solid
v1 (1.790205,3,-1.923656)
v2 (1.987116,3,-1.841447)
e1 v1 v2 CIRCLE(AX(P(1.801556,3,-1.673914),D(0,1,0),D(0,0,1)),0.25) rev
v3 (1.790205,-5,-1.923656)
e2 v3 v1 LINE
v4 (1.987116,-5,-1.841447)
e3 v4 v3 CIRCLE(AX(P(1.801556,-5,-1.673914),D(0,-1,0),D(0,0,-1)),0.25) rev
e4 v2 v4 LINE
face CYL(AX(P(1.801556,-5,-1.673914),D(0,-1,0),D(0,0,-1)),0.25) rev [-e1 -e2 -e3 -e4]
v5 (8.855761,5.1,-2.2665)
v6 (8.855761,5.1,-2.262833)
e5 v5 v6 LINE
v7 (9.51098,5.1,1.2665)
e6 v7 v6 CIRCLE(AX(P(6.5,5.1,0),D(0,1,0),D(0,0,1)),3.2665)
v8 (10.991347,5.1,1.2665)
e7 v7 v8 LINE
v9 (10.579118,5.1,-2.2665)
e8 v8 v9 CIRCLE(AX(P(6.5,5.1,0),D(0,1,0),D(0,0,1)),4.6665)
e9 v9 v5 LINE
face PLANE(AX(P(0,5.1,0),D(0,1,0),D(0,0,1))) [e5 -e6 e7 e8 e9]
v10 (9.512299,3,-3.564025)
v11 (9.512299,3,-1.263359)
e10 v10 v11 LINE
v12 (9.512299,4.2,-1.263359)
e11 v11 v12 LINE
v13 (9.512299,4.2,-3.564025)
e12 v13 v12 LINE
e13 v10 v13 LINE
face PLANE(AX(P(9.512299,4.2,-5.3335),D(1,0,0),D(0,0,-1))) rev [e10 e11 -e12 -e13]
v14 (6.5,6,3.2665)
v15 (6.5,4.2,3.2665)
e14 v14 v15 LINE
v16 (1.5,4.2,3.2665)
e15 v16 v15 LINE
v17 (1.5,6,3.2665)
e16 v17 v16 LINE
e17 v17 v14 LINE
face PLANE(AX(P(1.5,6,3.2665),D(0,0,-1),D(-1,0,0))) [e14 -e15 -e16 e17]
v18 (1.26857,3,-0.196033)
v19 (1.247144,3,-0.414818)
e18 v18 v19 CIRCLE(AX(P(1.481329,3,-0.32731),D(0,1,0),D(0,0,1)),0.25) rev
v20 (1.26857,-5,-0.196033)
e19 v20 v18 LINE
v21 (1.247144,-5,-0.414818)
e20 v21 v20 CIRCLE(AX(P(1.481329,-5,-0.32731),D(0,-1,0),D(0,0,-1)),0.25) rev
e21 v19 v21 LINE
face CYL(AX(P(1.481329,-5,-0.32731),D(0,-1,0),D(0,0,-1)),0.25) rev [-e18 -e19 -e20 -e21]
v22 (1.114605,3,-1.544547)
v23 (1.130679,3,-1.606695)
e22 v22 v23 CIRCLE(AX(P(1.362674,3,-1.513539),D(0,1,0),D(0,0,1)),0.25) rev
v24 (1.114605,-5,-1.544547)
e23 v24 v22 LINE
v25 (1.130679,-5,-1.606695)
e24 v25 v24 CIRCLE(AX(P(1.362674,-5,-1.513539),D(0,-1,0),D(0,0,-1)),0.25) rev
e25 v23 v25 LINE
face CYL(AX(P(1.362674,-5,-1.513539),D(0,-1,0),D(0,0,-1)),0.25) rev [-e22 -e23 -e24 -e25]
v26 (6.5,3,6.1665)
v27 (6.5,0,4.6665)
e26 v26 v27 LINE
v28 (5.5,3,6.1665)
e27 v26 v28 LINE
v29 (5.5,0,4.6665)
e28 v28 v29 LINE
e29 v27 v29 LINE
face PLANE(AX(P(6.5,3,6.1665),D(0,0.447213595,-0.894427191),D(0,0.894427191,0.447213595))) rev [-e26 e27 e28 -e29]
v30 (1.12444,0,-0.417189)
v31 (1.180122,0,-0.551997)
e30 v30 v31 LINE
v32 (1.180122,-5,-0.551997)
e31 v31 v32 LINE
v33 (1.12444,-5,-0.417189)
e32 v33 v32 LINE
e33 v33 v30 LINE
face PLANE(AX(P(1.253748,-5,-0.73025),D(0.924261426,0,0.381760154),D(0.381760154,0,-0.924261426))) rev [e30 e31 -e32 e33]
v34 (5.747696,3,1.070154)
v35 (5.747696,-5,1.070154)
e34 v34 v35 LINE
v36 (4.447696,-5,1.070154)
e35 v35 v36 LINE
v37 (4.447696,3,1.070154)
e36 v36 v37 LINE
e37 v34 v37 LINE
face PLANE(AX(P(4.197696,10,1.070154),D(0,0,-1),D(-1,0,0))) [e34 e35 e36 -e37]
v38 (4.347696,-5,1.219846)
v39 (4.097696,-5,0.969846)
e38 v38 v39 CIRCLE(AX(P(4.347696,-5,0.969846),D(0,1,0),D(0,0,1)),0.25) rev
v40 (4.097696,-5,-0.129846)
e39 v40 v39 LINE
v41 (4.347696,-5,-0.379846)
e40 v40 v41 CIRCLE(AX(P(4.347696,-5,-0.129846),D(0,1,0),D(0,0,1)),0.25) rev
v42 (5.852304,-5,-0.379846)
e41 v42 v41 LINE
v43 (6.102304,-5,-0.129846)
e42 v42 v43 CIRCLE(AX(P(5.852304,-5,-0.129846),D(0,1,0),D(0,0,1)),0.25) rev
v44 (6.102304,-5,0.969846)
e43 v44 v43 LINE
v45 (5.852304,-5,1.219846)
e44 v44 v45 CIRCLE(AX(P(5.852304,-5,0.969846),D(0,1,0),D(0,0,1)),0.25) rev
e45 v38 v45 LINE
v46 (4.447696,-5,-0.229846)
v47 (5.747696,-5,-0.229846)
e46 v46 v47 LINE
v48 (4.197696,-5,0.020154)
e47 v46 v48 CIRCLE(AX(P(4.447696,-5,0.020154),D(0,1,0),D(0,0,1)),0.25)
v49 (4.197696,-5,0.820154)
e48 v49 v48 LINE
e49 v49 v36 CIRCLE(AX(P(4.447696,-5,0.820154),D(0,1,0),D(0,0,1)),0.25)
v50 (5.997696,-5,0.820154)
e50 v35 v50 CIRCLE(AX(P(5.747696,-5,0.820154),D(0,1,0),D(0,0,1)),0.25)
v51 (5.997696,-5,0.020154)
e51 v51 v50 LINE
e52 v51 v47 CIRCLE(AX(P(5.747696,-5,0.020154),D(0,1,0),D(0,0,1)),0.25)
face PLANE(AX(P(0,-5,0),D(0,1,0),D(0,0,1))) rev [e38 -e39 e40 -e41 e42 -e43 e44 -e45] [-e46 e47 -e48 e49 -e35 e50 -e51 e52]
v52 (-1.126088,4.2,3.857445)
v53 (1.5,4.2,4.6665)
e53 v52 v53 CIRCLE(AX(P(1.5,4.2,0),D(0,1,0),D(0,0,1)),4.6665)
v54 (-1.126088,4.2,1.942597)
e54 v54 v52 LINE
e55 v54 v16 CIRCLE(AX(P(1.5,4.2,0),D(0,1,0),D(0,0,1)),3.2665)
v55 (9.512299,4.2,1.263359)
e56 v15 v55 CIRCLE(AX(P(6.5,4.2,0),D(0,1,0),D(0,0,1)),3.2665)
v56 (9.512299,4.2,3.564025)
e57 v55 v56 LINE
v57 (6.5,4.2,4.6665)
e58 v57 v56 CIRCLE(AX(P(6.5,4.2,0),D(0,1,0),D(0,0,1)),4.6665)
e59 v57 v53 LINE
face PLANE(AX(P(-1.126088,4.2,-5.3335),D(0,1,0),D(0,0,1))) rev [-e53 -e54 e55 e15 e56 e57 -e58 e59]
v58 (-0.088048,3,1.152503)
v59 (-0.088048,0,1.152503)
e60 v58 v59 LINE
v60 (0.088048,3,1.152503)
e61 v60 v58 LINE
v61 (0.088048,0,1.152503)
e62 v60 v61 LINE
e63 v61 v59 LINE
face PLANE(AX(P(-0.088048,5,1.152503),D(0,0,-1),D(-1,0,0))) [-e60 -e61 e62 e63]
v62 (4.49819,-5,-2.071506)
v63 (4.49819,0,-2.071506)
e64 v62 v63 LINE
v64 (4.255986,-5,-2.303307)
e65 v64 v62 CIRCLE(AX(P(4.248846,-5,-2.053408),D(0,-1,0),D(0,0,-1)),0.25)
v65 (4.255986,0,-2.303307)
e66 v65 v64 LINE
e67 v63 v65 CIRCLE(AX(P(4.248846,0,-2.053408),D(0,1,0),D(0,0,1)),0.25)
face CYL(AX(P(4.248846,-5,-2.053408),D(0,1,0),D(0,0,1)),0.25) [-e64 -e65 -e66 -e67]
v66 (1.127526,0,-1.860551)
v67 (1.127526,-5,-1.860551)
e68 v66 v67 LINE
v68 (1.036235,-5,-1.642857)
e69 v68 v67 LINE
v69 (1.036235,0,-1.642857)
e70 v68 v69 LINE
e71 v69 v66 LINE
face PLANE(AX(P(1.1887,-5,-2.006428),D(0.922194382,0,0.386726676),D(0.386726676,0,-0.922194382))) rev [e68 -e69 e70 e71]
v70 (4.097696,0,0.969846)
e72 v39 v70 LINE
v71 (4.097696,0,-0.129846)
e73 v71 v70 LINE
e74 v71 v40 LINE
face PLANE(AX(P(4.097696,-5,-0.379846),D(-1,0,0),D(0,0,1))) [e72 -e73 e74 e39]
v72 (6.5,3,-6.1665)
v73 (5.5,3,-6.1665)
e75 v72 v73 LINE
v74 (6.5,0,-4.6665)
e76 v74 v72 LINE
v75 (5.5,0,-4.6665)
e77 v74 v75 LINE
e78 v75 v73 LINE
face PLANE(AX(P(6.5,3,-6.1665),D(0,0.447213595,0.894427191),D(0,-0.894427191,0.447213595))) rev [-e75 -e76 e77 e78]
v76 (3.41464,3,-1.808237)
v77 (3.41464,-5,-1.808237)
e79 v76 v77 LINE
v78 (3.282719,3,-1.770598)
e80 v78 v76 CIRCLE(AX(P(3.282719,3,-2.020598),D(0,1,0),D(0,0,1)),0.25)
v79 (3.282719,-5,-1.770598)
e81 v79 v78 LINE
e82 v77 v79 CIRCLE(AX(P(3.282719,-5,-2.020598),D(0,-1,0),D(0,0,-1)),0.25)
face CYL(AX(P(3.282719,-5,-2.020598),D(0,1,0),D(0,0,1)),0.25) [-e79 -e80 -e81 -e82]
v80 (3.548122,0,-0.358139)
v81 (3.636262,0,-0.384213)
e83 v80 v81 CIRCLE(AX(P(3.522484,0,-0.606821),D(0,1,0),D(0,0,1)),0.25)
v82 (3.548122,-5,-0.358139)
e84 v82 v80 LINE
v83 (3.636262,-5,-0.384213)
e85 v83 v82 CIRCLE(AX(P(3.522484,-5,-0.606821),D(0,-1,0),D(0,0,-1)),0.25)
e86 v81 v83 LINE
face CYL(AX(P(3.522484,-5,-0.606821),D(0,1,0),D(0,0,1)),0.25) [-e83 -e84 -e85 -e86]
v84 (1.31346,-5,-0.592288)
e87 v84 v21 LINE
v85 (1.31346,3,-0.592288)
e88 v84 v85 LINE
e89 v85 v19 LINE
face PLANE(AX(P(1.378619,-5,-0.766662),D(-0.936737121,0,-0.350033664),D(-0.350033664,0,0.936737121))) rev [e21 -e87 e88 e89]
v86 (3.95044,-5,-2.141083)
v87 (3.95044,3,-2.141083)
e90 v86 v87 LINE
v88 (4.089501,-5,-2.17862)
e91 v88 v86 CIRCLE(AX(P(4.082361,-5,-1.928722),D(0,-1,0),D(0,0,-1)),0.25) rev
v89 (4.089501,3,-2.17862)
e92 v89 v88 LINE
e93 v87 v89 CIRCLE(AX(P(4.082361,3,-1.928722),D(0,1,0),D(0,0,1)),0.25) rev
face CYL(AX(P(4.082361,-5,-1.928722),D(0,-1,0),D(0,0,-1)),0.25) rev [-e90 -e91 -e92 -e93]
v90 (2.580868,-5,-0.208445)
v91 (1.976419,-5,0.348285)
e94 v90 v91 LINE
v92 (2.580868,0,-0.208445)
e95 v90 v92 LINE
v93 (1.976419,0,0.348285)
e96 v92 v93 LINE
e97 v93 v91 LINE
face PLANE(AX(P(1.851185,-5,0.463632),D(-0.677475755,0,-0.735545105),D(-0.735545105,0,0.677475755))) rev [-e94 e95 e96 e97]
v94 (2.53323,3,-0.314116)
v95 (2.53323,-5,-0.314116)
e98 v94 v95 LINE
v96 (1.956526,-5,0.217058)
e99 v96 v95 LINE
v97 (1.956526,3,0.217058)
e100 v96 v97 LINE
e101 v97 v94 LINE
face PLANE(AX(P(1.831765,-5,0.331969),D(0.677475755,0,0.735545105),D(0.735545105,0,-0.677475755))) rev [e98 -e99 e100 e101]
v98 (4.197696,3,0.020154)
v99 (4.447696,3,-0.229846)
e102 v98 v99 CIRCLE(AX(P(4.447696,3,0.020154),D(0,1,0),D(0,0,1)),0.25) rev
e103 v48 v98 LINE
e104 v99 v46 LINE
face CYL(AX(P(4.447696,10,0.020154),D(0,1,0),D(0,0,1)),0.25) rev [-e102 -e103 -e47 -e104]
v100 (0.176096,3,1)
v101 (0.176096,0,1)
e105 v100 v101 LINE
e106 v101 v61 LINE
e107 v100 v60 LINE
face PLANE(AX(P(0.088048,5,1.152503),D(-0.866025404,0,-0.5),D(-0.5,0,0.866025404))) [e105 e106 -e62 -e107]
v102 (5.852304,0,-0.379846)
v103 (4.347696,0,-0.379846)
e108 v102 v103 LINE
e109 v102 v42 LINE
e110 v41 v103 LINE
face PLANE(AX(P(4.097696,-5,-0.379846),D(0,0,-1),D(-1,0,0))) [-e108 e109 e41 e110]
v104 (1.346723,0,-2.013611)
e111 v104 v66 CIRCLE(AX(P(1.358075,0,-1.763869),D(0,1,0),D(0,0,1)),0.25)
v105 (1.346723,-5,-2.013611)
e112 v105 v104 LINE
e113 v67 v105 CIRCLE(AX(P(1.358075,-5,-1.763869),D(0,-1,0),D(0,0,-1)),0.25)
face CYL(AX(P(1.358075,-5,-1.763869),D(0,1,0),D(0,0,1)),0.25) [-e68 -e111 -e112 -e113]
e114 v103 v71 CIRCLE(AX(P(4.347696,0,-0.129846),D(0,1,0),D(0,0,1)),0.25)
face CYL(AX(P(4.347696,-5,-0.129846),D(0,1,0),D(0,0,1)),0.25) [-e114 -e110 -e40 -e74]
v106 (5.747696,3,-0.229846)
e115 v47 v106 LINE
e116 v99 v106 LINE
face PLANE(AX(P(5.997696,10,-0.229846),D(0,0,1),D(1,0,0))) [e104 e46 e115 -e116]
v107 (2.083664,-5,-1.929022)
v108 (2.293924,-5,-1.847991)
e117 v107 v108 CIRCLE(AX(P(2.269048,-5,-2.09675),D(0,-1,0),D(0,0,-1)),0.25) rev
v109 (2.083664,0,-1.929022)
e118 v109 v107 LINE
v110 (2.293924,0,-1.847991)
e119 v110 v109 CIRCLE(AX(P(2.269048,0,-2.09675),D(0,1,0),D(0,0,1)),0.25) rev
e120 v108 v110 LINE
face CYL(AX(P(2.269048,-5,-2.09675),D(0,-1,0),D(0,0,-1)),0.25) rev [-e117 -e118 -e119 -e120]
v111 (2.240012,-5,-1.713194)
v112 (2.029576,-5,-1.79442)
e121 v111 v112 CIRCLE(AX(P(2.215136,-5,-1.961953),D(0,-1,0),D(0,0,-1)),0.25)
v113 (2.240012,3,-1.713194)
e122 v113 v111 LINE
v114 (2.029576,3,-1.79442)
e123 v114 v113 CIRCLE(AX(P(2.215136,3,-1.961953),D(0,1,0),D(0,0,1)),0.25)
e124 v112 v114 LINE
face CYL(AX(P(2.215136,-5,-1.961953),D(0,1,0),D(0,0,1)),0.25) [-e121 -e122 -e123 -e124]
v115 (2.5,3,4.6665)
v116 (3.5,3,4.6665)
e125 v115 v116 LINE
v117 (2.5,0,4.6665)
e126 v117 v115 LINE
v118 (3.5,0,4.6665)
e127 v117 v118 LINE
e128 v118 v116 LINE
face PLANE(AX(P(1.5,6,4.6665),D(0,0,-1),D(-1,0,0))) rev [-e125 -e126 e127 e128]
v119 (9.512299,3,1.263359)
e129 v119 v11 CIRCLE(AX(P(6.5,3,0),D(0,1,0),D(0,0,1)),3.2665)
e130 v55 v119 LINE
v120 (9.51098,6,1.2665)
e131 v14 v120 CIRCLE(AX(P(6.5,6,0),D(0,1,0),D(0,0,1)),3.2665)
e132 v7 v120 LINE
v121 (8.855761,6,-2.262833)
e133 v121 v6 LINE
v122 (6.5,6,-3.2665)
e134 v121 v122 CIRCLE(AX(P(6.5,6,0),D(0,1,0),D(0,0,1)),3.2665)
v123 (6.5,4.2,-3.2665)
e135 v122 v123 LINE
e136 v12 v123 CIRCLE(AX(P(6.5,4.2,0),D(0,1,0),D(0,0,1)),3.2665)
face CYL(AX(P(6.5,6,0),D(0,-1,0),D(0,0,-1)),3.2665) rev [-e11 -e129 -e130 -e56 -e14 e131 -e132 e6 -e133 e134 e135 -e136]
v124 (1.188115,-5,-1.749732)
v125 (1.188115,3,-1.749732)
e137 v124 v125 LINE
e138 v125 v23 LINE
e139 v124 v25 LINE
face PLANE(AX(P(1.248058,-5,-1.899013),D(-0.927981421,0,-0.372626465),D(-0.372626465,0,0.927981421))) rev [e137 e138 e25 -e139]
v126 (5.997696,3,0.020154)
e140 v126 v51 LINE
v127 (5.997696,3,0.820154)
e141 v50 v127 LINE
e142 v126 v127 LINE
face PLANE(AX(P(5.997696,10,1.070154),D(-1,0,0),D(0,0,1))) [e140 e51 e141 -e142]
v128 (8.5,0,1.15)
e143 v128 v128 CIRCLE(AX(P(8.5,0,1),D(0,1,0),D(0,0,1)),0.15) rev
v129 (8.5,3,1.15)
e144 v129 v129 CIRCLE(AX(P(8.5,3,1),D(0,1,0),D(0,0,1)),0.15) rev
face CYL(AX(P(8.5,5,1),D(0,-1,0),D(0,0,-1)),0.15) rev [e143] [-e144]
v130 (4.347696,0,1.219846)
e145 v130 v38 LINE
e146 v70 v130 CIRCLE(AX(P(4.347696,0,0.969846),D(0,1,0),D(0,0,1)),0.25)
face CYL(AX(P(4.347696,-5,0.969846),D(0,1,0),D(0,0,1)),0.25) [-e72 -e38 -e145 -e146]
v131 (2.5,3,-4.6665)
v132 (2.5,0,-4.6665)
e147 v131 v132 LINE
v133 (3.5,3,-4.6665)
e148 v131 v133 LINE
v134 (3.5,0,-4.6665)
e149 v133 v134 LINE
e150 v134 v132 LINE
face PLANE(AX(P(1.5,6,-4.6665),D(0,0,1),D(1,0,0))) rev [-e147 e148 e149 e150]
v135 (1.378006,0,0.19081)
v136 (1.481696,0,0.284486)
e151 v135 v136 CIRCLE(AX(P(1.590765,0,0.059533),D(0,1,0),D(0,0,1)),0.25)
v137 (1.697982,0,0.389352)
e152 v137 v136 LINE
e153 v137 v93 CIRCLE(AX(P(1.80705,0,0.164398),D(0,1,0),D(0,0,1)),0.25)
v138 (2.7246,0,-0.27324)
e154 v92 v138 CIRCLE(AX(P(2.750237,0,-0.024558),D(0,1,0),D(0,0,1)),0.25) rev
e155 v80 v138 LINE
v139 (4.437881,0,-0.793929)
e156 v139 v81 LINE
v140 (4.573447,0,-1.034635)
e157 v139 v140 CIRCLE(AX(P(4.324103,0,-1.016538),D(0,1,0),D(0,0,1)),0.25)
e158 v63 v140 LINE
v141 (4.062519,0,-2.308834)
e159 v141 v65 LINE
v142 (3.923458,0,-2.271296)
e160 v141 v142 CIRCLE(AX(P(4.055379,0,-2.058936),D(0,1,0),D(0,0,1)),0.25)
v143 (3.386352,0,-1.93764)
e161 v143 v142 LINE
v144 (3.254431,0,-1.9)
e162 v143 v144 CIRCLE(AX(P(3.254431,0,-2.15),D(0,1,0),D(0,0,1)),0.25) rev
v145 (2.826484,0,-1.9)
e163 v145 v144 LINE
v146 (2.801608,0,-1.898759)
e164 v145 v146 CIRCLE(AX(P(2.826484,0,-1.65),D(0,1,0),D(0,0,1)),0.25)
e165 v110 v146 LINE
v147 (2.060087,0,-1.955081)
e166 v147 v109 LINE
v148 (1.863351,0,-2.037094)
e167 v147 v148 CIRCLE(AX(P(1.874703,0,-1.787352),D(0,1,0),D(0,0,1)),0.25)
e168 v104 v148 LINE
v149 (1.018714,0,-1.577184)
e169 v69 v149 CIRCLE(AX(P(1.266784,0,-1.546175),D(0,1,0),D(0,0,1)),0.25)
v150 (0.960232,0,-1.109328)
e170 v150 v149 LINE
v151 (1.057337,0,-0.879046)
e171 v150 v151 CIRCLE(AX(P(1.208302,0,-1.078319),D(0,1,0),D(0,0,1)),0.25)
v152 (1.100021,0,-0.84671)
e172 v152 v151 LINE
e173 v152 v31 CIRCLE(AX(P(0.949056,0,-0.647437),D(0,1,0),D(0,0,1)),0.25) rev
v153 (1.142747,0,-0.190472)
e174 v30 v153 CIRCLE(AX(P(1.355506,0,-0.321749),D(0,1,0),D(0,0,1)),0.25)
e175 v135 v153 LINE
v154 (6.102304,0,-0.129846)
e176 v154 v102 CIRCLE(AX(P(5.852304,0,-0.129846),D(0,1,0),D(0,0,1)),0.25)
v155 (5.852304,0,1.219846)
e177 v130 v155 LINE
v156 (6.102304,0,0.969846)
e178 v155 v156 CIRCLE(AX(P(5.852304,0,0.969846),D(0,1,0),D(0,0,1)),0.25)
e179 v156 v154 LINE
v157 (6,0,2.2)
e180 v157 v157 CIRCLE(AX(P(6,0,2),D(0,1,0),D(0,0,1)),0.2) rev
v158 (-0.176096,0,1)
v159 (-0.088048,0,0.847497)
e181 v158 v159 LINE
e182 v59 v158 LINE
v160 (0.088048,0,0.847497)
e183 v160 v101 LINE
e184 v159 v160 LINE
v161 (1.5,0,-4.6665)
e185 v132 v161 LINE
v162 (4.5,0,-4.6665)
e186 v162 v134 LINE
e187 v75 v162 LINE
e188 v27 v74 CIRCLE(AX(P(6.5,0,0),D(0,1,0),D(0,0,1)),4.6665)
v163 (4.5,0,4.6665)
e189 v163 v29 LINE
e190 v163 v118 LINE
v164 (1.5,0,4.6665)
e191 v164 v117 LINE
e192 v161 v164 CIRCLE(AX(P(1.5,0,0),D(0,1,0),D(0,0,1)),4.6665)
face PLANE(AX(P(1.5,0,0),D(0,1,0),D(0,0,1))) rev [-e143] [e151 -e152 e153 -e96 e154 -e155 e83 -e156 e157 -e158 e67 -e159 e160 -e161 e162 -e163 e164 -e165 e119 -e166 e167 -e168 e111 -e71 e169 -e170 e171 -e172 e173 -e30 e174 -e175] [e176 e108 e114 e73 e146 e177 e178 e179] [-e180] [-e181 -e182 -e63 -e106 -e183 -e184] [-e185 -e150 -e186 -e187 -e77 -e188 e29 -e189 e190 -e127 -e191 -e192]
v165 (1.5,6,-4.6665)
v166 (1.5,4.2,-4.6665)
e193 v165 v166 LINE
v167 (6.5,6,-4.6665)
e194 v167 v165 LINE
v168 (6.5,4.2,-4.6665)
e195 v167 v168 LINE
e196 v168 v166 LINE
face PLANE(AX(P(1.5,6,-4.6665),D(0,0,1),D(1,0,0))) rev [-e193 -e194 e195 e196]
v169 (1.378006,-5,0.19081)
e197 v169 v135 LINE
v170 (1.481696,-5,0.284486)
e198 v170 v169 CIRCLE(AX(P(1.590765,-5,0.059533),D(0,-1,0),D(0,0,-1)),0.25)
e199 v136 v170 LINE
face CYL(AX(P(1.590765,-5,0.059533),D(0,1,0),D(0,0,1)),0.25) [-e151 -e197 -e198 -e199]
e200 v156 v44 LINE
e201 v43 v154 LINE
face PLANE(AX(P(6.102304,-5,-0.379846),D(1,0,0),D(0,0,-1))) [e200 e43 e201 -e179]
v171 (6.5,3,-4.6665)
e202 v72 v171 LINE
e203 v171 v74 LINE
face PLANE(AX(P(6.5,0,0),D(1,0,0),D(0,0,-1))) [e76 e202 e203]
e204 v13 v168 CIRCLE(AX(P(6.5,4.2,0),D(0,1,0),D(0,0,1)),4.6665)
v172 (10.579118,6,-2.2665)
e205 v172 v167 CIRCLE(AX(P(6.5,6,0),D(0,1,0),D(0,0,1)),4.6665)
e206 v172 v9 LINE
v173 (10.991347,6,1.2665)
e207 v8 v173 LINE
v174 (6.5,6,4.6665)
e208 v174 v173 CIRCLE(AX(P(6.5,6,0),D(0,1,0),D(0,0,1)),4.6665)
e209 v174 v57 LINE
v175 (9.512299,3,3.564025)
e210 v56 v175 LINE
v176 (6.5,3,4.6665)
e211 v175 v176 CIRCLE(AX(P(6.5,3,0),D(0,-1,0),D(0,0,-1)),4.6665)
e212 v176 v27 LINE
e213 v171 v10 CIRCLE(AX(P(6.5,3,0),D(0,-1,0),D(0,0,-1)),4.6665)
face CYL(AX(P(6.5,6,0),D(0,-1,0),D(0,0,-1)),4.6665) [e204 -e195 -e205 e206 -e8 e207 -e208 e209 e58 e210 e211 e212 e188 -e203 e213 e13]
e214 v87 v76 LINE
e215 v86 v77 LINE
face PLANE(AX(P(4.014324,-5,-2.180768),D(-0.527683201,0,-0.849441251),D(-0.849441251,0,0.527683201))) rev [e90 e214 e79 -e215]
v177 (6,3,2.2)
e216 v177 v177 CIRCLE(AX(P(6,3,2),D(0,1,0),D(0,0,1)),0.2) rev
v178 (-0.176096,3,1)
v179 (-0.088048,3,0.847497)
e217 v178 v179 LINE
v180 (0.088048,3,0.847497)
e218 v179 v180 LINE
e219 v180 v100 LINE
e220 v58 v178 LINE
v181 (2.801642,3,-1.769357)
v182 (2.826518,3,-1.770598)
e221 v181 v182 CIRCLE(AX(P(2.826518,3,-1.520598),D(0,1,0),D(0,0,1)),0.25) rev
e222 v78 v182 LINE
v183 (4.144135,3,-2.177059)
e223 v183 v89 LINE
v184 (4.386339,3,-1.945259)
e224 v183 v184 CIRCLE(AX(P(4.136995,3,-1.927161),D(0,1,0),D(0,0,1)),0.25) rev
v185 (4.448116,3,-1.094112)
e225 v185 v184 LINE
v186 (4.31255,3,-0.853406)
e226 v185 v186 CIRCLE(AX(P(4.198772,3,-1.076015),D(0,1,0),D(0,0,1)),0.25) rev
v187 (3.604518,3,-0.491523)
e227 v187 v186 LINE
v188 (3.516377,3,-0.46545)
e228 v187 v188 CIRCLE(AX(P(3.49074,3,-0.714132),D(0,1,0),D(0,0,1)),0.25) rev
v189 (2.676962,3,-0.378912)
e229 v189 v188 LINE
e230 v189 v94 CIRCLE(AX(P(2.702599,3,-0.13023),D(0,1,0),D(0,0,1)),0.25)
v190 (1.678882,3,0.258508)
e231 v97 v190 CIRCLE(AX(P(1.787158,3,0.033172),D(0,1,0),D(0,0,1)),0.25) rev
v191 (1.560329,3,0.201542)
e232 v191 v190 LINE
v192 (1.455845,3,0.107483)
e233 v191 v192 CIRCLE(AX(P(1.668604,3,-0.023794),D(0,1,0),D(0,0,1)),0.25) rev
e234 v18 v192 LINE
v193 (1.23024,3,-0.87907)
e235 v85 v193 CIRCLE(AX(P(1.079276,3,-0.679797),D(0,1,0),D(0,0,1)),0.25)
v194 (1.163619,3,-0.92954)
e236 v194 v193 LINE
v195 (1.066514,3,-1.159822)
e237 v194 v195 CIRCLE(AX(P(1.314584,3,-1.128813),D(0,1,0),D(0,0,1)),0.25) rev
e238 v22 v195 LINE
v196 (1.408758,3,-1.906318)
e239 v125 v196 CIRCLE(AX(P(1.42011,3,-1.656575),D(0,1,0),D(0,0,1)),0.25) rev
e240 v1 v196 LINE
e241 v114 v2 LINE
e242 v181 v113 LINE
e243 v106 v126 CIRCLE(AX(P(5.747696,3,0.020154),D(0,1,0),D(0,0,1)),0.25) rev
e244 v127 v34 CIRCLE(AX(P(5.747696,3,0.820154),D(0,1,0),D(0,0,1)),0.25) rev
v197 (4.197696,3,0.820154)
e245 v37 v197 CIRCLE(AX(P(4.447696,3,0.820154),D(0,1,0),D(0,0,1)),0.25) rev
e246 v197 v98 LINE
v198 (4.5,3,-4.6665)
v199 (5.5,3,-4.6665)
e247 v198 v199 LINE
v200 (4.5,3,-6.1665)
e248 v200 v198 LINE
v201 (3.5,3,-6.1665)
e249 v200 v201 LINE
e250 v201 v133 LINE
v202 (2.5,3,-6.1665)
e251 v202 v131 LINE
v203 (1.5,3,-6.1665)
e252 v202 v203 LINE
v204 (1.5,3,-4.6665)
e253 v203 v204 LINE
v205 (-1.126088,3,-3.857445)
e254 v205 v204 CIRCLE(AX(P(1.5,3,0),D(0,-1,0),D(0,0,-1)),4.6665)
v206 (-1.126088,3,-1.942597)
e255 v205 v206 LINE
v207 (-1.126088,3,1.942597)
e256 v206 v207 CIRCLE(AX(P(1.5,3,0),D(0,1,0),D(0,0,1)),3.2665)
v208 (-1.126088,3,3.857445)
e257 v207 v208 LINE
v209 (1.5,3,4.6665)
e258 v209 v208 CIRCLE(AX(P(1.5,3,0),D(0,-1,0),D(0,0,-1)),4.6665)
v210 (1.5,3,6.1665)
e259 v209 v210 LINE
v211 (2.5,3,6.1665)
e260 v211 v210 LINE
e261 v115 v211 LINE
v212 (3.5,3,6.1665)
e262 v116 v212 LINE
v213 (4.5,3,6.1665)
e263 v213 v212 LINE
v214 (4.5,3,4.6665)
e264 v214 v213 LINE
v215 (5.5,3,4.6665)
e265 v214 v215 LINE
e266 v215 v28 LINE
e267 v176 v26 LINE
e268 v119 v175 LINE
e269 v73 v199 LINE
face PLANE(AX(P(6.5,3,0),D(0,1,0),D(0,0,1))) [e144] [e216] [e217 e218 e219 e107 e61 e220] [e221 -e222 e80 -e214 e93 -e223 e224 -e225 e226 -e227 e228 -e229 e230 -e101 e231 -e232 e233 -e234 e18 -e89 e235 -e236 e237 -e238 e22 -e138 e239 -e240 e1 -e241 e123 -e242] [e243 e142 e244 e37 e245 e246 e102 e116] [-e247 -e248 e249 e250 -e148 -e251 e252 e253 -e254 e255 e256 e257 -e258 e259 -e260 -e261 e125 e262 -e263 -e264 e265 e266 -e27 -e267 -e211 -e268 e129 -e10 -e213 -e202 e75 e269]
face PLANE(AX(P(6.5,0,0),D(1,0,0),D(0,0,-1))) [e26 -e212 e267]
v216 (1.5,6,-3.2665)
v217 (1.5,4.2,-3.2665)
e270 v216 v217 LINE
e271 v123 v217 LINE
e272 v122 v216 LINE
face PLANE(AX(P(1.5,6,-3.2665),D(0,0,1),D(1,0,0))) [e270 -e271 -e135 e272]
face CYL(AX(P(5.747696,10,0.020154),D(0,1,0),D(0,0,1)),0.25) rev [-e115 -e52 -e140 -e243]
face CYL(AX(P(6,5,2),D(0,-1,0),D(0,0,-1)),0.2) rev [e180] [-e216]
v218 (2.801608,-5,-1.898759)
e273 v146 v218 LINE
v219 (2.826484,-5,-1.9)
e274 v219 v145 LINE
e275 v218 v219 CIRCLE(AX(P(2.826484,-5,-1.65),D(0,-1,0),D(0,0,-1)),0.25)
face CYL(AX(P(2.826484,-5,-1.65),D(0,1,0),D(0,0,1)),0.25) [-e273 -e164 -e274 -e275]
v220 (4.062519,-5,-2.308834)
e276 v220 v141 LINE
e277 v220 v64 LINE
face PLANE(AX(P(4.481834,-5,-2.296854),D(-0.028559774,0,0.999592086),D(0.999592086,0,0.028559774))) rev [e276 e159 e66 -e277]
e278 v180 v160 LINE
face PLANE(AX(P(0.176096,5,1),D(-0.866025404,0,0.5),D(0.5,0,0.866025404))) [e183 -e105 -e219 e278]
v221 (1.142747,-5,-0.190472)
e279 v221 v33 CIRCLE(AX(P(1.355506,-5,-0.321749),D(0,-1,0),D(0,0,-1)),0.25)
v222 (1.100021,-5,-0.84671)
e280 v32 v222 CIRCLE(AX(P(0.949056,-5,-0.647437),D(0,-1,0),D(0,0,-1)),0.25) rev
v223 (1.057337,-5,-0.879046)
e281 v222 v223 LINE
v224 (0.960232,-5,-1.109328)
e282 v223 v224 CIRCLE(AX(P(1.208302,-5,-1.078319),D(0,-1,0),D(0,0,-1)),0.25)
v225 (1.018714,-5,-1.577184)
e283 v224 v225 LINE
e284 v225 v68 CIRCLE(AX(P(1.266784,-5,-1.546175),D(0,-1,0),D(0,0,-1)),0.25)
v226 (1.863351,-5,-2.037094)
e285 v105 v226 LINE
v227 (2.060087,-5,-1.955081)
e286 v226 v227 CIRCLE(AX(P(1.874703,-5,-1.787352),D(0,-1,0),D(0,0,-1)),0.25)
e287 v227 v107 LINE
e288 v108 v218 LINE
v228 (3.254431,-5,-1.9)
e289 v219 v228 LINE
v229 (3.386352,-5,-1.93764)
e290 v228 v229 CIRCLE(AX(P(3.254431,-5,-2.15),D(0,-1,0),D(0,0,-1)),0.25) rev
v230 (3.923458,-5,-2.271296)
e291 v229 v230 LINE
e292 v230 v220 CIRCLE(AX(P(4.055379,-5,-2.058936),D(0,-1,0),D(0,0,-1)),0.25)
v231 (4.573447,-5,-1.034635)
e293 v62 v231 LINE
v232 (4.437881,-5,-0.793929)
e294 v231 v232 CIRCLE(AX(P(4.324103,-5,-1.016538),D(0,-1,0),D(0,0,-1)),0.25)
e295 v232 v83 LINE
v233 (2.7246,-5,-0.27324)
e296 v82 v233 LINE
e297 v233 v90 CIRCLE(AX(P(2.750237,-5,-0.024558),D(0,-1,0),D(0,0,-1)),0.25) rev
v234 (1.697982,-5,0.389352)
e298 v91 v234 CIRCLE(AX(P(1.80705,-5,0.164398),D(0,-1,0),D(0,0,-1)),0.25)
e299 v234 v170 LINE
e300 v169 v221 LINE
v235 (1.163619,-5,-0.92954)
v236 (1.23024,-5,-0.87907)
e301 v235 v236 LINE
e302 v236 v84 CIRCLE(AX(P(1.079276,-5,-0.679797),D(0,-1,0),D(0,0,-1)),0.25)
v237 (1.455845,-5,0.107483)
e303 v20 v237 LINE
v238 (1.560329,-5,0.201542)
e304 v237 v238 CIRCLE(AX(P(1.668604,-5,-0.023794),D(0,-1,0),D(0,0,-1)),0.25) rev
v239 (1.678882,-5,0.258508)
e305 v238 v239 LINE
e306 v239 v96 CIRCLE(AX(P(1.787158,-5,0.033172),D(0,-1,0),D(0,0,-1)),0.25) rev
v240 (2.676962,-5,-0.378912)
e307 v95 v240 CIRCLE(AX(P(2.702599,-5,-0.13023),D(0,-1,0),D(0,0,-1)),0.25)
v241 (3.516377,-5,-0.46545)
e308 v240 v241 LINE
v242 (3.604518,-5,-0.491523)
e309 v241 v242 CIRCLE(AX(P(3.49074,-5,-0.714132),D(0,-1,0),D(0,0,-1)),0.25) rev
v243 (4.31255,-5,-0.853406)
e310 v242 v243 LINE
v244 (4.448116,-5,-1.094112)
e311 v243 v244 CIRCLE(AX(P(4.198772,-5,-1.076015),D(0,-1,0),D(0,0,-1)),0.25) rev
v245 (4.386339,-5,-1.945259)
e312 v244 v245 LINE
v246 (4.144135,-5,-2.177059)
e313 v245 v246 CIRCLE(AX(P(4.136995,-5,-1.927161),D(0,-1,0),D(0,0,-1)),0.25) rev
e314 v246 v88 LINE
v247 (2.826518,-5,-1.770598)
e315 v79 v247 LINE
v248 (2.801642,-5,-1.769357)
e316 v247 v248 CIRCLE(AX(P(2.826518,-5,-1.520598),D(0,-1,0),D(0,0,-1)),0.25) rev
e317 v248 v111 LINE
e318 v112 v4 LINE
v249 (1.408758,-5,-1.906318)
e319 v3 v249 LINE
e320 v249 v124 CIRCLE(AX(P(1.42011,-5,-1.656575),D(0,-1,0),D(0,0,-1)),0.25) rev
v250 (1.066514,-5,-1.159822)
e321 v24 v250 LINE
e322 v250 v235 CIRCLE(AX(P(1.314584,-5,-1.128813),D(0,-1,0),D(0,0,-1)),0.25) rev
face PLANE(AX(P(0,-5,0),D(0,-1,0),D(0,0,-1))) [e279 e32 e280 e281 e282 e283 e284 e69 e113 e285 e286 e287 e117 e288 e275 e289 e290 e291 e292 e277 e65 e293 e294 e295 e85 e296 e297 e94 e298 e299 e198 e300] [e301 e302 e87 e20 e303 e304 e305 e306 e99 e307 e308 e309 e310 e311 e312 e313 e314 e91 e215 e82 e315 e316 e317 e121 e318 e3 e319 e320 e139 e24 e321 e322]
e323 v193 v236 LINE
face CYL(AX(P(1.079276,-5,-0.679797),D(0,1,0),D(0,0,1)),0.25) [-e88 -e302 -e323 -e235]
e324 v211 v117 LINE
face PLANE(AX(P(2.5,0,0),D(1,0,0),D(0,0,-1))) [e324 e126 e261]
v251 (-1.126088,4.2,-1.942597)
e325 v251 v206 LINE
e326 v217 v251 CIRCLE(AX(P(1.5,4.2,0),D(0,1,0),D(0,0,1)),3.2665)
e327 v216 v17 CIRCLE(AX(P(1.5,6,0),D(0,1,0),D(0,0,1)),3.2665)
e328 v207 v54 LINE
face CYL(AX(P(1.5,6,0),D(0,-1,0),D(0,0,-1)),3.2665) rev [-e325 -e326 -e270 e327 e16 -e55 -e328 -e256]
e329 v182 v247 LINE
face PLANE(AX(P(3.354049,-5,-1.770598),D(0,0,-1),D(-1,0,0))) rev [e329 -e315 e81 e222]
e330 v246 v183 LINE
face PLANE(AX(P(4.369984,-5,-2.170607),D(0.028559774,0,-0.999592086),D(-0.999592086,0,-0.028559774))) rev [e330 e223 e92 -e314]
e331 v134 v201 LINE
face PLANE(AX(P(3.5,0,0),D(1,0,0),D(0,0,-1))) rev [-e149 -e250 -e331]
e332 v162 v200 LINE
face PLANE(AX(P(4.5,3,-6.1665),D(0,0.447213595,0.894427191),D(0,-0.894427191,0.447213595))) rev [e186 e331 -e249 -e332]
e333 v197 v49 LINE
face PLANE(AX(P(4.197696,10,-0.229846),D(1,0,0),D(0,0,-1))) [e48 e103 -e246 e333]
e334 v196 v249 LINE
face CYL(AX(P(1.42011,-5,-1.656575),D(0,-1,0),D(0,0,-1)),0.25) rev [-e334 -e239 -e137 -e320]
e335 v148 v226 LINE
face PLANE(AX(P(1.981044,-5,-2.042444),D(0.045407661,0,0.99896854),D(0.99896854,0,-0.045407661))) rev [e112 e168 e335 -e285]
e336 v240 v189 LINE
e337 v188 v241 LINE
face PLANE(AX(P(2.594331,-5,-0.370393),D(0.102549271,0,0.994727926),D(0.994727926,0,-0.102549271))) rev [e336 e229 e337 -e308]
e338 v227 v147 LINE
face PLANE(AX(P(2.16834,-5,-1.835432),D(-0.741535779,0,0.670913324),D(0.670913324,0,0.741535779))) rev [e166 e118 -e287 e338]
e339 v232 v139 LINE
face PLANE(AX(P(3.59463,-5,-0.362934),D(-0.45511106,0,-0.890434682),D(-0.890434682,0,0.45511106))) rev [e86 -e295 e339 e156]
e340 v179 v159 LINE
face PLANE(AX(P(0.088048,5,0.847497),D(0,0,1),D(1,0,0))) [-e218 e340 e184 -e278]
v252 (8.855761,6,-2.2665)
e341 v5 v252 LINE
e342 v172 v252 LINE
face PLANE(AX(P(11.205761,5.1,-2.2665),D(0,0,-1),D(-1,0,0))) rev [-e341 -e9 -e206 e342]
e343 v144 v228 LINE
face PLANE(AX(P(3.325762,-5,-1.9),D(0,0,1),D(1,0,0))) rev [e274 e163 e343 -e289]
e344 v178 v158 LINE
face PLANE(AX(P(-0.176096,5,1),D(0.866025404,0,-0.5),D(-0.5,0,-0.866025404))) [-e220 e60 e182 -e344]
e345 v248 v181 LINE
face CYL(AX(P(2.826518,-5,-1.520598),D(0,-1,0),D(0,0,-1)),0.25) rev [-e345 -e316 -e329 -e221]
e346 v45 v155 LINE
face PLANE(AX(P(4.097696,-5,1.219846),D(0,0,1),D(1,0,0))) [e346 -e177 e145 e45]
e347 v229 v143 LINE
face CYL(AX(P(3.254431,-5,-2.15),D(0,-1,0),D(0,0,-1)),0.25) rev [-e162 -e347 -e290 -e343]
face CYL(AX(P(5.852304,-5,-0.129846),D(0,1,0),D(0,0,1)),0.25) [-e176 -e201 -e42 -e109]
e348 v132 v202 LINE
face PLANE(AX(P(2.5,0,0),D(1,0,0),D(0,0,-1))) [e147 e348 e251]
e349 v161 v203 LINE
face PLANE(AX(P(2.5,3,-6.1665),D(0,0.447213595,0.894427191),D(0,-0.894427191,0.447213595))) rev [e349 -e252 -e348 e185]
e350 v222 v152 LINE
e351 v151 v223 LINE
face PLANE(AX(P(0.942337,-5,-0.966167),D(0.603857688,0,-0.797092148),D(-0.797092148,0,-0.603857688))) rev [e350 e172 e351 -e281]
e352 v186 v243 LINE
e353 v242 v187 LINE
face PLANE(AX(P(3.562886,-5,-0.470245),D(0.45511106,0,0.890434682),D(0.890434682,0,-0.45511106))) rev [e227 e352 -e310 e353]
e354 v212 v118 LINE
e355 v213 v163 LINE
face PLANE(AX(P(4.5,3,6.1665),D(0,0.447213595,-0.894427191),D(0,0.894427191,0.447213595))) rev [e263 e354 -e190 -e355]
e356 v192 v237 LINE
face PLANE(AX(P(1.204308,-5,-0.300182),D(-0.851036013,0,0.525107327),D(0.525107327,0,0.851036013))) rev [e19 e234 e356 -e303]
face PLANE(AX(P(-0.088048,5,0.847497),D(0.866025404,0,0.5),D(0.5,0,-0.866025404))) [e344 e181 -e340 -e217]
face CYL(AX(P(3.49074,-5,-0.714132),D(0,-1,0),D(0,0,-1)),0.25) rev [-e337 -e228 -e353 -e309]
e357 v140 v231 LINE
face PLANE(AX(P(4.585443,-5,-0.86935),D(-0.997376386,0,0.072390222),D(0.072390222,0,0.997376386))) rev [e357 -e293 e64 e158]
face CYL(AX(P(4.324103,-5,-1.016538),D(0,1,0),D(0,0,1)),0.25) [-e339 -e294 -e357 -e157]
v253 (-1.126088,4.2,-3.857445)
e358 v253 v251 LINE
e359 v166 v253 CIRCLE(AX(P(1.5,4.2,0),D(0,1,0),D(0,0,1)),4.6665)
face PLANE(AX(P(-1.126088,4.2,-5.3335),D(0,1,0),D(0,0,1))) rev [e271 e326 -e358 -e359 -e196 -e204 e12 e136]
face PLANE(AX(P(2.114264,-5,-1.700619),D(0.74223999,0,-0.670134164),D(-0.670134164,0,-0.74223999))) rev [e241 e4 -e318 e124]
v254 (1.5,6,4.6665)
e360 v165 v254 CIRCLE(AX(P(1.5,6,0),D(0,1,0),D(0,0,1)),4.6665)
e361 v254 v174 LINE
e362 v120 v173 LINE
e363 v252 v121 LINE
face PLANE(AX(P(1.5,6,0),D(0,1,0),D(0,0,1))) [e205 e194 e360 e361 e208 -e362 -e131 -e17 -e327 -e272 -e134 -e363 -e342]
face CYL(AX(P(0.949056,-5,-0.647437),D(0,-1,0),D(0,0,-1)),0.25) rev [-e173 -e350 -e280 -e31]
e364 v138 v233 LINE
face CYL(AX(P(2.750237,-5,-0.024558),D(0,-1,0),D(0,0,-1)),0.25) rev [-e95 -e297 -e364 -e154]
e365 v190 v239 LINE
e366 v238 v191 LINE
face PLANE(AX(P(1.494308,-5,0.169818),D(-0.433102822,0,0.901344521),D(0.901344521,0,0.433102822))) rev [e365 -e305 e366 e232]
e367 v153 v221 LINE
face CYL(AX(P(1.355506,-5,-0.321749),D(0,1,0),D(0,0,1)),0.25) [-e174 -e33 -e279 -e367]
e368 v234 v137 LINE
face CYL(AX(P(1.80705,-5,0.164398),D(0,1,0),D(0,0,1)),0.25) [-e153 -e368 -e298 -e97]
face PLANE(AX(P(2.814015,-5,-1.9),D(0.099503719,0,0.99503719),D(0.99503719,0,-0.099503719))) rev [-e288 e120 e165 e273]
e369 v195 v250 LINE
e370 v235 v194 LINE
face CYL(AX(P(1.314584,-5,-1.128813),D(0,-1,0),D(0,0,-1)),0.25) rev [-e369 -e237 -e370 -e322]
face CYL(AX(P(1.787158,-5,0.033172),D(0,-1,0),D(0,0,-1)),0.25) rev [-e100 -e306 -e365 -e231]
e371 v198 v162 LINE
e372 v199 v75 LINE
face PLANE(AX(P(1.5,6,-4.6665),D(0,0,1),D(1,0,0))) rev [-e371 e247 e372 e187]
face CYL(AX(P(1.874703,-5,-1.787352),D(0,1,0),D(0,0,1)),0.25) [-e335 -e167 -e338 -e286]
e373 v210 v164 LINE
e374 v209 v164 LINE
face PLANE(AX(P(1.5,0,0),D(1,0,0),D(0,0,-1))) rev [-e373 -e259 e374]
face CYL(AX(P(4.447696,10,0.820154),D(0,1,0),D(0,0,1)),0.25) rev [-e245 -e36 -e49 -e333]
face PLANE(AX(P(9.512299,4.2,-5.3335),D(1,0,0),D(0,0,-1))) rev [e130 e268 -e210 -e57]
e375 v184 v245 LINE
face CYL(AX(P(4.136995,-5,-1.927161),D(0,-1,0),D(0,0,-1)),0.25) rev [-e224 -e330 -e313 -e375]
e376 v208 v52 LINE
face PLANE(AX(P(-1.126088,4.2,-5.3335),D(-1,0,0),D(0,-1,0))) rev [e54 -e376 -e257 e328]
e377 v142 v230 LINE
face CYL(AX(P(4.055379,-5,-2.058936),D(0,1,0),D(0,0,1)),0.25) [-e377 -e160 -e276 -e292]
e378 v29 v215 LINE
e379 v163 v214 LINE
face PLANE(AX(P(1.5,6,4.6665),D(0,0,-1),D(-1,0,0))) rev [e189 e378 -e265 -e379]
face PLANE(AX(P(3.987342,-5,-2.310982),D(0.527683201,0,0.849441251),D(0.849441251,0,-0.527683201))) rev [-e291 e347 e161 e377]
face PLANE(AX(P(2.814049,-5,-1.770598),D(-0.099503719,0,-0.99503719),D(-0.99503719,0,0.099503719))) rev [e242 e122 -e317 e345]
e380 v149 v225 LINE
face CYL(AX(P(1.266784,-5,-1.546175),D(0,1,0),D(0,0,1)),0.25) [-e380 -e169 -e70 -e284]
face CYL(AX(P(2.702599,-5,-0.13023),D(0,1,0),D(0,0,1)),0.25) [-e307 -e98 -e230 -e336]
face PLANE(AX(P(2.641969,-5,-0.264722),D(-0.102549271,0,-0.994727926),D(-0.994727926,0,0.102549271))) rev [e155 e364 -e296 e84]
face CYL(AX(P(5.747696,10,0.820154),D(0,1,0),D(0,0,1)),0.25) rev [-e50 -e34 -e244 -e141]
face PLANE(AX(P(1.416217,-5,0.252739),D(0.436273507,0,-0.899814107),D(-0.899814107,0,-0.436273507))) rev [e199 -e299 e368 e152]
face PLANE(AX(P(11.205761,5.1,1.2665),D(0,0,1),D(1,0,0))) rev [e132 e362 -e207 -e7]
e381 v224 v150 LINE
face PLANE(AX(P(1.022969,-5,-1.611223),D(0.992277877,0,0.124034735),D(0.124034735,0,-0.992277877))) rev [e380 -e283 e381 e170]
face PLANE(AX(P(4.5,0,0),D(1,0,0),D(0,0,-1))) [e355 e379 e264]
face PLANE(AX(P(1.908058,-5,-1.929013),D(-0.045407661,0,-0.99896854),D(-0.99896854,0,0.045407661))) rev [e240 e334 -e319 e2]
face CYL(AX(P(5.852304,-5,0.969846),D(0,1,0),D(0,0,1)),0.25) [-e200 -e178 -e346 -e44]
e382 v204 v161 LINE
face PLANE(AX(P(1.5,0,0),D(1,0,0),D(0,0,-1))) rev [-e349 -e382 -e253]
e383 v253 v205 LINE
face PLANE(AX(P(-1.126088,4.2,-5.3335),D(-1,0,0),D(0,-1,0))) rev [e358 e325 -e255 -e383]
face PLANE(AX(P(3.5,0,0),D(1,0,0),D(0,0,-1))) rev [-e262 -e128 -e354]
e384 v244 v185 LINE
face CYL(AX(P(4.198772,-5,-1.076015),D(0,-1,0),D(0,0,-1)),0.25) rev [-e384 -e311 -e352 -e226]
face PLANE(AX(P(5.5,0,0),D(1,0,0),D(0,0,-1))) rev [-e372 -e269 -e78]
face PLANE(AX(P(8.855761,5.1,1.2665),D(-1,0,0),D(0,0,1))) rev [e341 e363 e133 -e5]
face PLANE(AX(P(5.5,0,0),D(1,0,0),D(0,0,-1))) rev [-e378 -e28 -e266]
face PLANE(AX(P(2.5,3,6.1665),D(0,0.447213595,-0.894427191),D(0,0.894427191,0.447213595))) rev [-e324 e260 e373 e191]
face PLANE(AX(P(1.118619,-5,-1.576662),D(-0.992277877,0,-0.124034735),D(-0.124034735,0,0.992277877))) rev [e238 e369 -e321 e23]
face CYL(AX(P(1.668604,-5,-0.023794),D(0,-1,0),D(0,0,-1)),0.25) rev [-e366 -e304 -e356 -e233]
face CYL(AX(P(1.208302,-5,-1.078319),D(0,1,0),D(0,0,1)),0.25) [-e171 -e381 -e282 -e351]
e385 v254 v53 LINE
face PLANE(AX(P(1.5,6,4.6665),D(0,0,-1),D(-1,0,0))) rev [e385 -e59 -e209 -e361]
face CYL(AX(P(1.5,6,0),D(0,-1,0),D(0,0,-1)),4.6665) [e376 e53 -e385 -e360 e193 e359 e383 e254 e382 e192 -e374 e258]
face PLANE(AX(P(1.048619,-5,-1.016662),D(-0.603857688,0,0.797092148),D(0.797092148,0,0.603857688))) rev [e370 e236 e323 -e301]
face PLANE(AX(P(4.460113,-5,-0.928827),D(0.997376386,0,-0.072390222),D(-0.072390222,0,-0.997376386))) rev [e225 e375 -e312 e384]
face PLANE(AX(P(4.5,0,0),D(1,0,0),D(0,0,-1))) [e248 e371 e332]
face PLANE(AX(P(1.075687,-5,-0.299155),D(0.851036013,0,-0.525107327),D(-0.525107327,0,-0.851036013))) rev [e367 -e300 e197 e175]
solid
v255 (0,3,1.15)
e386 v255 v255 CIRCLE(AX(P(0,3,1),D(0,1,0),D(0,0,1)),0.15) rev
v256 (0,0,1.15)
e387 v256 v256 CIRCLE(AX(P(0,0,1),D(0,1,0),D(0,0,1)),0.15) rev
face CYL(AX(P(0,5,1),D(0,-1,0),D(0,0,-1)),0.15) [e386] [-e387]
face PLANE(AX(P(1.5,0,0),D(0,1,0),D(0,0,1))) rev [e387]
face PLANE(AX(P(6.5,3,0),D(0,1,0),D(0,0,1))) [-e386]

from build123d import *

# Parameters (mm, degrees)
LIP_DEPTH                    = 6
BASE_DEPTH                   = 3
LAMDABREGMAGUIDES_DEPTH      = 5
LAMDABREGMAGUIDES_DEPTH_BACK = 5
SKETCH16_R                   = 0.15
SKETCH16_R_2                 = 0.2
SKETCH3_W                    = 10.638387248
SKETCH3_H                    = 1.2
CUT4ACRYLIC_DEPTH            = 10
SKETCH4_W                    = 2.35
SKETCH4_H                    = 3.533
CUTFORGROUNDPIN_DEPTH        = 0.9
BOSS_EXTRUDE6_DEPTH          = 1
CRVPATTERN1_START            = 3.5
CRVPATTERN1_DEPTH            = 1
CRVPATTERN1_START_2          = 5.5
CRVPATTERN1_2_DEPTH          = 1
BOSS_EXTRUDE7_DEPTH          = 1
CRVPATTERN5_START            = 3.5
CRVPATTERN5_DEPTH            = 1
CRVPATTERN5_START_2          = 5.5
CRVPATTERN5_2_DEPTH          = 1
BOSS_EXTRUDE8_DEPTH          = 0.5
BOSS_EXTRUDE8_DEPTH_BACK     = 5
SKETCH34_W                   = 2.004608144
SKETCH34_H                   = 1.59969208
BOSS_EXTRUDE9_DEPTH          = 5
CUT_EXTRUDE1_DEPTH           = 16.057106113
CUT_EXTRUDE1_DEPTH_BACK      = 16.057106113
CUT_EXTRUDE3_DEPTH           = 10
CUT_EXTRUDE3_DEPTH_BACK      = 10
SKETCH32_W                   = 1.8
SKETCH32_H                   = 1.3
FILLET1_R                    = 0.25


# Read off the part's stored shape, not the designer's step: Lip, CrvPattern1, CrvPattern5
with BuildPart() as part:
    # Lip outline → Lip (new body)
    with BuildSketch(Plane(origin=(0, 0, 0), x_dir=(1, 0, 0), z_dir=(0, 1, 0))):
        with BuildLine():
            ThreePointArc((1.5, 4.6665), (-3.1665, 0), (1.5, -4.6665))
            Line((1.5, -4.6665), (6.5, -4.6665))
            ThreePointArc((6.5, -4.6665), (11.1665, 0), (6.5, 4.6665))
            Line((6.5, 4.6665), (1.5, 4.6665))
        make_face()
        with BuildLine():
            Line((6.5, -3.2665), (1.5, -3.2665))
            ThreePointArc((1.5, -3.2665), (-1.7665, 0), (1.5, 3.2665))
            Line((1.5, 3.2665), (6.5, 3.2665))
            ThreePointArc((6.5, 3.2665), (9.7665, 0), (6.5, -3.2665))
        make_face(mode=Mode.SUBTRACT)
    extrude(amount=LIP_DEPTH)

    # Sketch2 → Base (add)
    with BuildSketch(Plane(origin=(0, 0, 0), x_dir=(1, 0, 0), z_dir=(0, 1, 0))):
        with BuildLine():
            Line((6.5, -3.2665), (1.5, -3.2665))
            ThreePointArc((1.5, -3.2665), (-1.7665, 0), (1.5, 3.2665))
            Line((1.5, 3.2665), (6.5, 3.2665))
            ThreePointArc((6.5, 3.2665), (9.7665, 0), (6.5, -3.2665))
        make_face()
    extrude(amount=BASE_DEPTH)

    # Sketch16 → LamdaBregmaGuides (cut, two sides: drawn at the far end of the back side and taken through both)
    # profile 1 of 3: a face of its own
    with BuildSketch(Plane(origin=(0, 0, 0), x_dir=(1, 0, 0), z_dir=(0, 1, 0)).offset(-LAMDABREGMAGUIDES_DEPTH_BACK)):
        with Locations(Location((8.5, -1, 0), (0, 0, 270))):
            Circle(SKETCH16_R)
    # profile 2 of 3: a face of its own
    with BuildSketch(Plane(origin=(0, 0, 0), x_dir=(1, 0, 0), z_dir=(0, 1, 0)).offset(-LAMDABREGMAGUIDES_DEPTH_BACK)):
        with Locations(Location((6, -2, 0), (0, 0, 270))):
            Circle(SKETCH16_R_2)
    # profile 3 of 3: a face of its own
    with BuildSketch(Plane(origin=(0, 0, 0), x_dir=(1, 0, 0), z_dir=(0, 1, 0)).offset(-LAMDABREGMAGUIDES_DEPTH_BACK)):
        Polygon((0.176095573, -1), (0.088047787, -0.84749676), (-0.088047787, -0.84749676), (-0.176095573, -1), (-0.088047787, -1.15250324), (0.088047787, -1.15250324), align=None)
        with Locations(Location((0, -1, 0), (0, 0, 270))):
            Circle(SKETCH16_R, mode=Mode.SUBTRACT)
    extrude(amount=LAMDABREGMAGUIDES_DEPTH + LAMDABREGMAGUIDES_DEPTH_BACK, mode=Mode.SUBTRACT)


with BuildPart() as lamdabregmaguides_piece_1:
    # of the separate pieces the step leaves, piece 1, a body of its own (lamdabregmaguides_pieces)
    add(part.part.solids().sort_by_distance((6.5, 0, -4.6665))[0])

    # Sketch3 → Cut4Acrylic (cut)
    with BuildSketch(Plane.XY.offset(4.6665)):
        with Locations((4.193105486, 3.6)):
            Rectangle(SKETCH3_W, SKETCH3_H)
    extrude(amount=-CUT4ACRYLIC_DEPTH, mode=Mode.SUBTRACT)

    # Sketch4 → CutforGroundPin (cut)
    with BuildSketch(Plane(origin=(0, 6, 0), x_dir=(1, 0, 0), z_dir=(0, 1, 0))):
        with Locations((10.030760676, 0.5)):
            Rectangle(SKETCH4_W, SKETCH4_H)
    extrude(amount=-CUTFORGROUNDPIN_DEPTH, mode=Mode.SUBTRACT)

    # Sketch21 → Boss-Extrude6 (add)
    with BuildSketch(Plane(origin=(1.5, 0, 0), x_dir=(0, 0, -1), z_dir=(1, 0, 0))):
        Polygon((-4.6665, 3), (-6.1665, 3), (-4.6665, 0), align=None)
    extrude(amount=BOSS_EXTRUDE6_DEPTH)

    # CrvPattern1 outline → CrvPattern1 (add)
    with BuildSketch(Plane.YZ.offset(CRVPATTERN1_START)):
        Polygon((0, 4.6665), (3, 4.6665), (3, 6.1665), align=None)
    extrude(amount=CRVPATTERN1_DEPTH)

    # CrvPattern1 2 outline → CrvPattern1 2 (add)
    with BuildSketch(Plane.YZ.offset(CRVPATTERN1_START_2)):
        Polygon((0, 4.6665), (3, 4.6665), (3, 6.1665), align=None)
    extrude(amount=CRVPATTERN1_2_DEPTH)

    # Sketch22 → Boss-Extrude7 (add)
    with BuildSketch(Plane(origin=(1.5, 0, 0), x_dir=(0, 0, -1), z_dir=(1, 0, 0))):
        Polygon((4.6665, 0), (4.6665, 3), (6.1665, 3), align=None)
    extrude(amount=BOSS_EXTRUDE7_DEPTH)

    # CrvPattern5 outline → CrvPattern5 (add)
    with BuildSketch(Plane.YZ.offset(CRVPATTERN5_START)):
        Polygon((0, -4.6665), (3, -6.1665), (3, -4.6665), align=None)
    extrude(amount=CRVPATTERN5_DEPTH)

    # CrvPattern5 2 outline → CrvPattern5 2 (add)
    with BuildSketch(Plane.YZ.offset(CRVPATTERN5_START_2)):
        Polygon((0, -4.6665), (3, -6.1665), (3, -4.6665), align=None)
    extrude(amount=CRVPATTERN5_2_DEPTH)

    # Sketch34 → Boss-Extrude8 (add, two sides: drawn at the far end of the back side and taken through both)
    with BuildSketch(Plane(origin=(0, 0, 0), x_dir=(1, 0, 0), z_dir=(0, 1, 0)).offset(-BOSS_EXTRUDE8_DEPTH_BACK)):
        with Locations((5.1, -0.42)):
            Rectangle(SKETCH34_W, SKETCH34_H)
    extrude(amount=BOSS_EXTRUDE8_DEPTH + BOSS_EXTRUDE8_DEPTH_BACK)

    # Sketch36 → Boss-Extrude9 (add)
    with BuildSketch(Plane(origin=(0, 0, 0), x_dir=(-1, 0, 0), z_dir=(0, -1, 0))):
        Polygon((-1.981043585, 2.042444066), (-1.188700431, 2.006428468), (-1.022968968, 1.61122267), (-0.942337029, 0.966167161), (-1.25374802, 0.730249744), (-1.075687083, 0.299154844), (-1.416217307, -0.252738967), (-1.851184586, -0.463632193), (-2.6419687, 0.264721596), (-3.594629911, 0.362934092), (-4.58544349, 0.869349921), (-4.481834345, 2.296853703), (-3.98734241, 2.310982044), (-3.32576156, 1.9), (-2.814014925, 1.9), (-2.168339777, 1.835432485), align=None)
    extrude(amount=BOSS_EXTRUDE9_DEPTH)

    # Sketch31 → Cut-Extrude1 (cut, two sides: drawn at the far end of the back side and taken through both)
    with BuildSketch(Plane(origin=(0, 3, 0), x_dir=(1, 0, 0), z_dir=(0, 1, 0)).offset(-CUT_EXTRUDE1_DEPTH_BACK)):
        Polygon((1.831765382, -0.331969349), (2.594330725, 0.370393466), (3.562885826, 0.470244508), (4.460112717, 0.928827141), (4.369983566, 2.170606548), (4.014324084, 2.180768248), (3.35404923, 1.770597505), (2.81404923, 1.770597505), (2.114263926, 1.700618975), (1.908057574, 1.929012942), (1.248057574, 1.899012942), (1.118618993, 1.576661716), (1.048618993, 1.016661716), (1.378618993, 0.766661716), (1.204307806, 0.300181554), (1.494307806, -0.169818446), align=None)
    extrude(amount=CUT_EXTRUDE1_DEPTH + CUT_EXTRUDE1_DEPTH_BACK, mode=Mode.SUBTRACT)

    # Sketch32 → Cut-Extrude3 (cut, two sides: drawn at the far end of the back side and taken through both)
    with BuildSketch(Plane(origin=(0, 0, 0), x_dir=(1, 0, 0), z_dir=(0, 1, 0)).offset(-CUT_EXTRUDE3_DEPTH_BACK)):
        with Locations((5.097695928, -0.42015396)):
            Rectangle(SKETCH32_W, SKETCH32_H)
    extrude(amount=CUT_EXTRUDE3_DEPTH + CUT_EXTRUDE3_DEPTH_BACK, mode=Mode.SUBTRACT)

    # Fillet1
    fillet1_edges = [lamdabregmaguides_piece_1.edges().sort_by_distance(p)[0] for p in [
        (6.102304072, -2.5, -0.37984604),
        (6.102304072, -2.5, 1.21984604),
        (4.097695928, -2.5, 1.21984604),
        (4.097695928, -2.5, -0.37984604),
        (0.942337029, -2.5, -0.966167161),
        (1.022968968, -2.5, -1.61122267),
        (1.188700431, -2.5, -2.006428468),
        (1.981043585, -2.5, -2.042444066),
        (2.168339777, -2.5, -1.835432485),
        (2.814014925, -2.5, -1.9),
        (3.32576156, -2.5, -1.9),
        (3.98734241, -2.5, -2.310982044),
        (4.481834345, -2.5, -2.296853703),
        (4.58544349, -2.5, -0.869349921),
        (3.594629911, -2.5, -0.362934092),
        (2.6419687, -2.5, -0.264721596),
        (1.851184586, -2.5, 0.463632193),
        (1.416217307, -2.5, 0.252738967),
        (1.075687083, -2.5, -0.299154844),
        (1.25374802, -2.5, -0.730249744),
        (1.831765382, -1, 0.331969349),
        (1.494307806, -1, 0.169818446),
        (1.204307806, -1, -0.300181554),
        (1.378618993, -1, -0.766661716),
        (1.048618993, -1, -1.016661716),
        (1.118618993, -1, -1.576661716),
        (1.248057574, -1, -1.899012942),
        (1.908057574, -1, -1.929012942),
        (2.114263926, -1, -1.700618975),
        (2.81404923, -1, -1.770597505),
        (3.35404923, -1, -1.770597505),
        (4.014324084, -1, -2.180768248),
        (4.369983566, -1, -2.170606548),
        (4.460112717, -1, -0.928827141),
        (3.562885826, -1, -0.470244508),
        (2.594330725, -1, -0.370393466),
        (5.997695928, -1, 1.07015396),
        (5.997695928, -1, -0.22984604),
        (4.197695928, -1, -0.22984604),
        (4.197695928, -1, 1.07015396),
    ]]
    fillet(fillet1_edges, radius=FILLET1_R)


with BuildPart() as lamdabregmaguides_piece_2:
    # of the separate pieces the step leaves, piece 2, a body of its own (lamdabregmaguides_pieces)
    add(part.part.solids().sort_by_distance((0, 0, 1.15))[0])


solid = Compound([lamdabregmaguides_piece_1.part, lamdabregmaguides_piece_2.part])
